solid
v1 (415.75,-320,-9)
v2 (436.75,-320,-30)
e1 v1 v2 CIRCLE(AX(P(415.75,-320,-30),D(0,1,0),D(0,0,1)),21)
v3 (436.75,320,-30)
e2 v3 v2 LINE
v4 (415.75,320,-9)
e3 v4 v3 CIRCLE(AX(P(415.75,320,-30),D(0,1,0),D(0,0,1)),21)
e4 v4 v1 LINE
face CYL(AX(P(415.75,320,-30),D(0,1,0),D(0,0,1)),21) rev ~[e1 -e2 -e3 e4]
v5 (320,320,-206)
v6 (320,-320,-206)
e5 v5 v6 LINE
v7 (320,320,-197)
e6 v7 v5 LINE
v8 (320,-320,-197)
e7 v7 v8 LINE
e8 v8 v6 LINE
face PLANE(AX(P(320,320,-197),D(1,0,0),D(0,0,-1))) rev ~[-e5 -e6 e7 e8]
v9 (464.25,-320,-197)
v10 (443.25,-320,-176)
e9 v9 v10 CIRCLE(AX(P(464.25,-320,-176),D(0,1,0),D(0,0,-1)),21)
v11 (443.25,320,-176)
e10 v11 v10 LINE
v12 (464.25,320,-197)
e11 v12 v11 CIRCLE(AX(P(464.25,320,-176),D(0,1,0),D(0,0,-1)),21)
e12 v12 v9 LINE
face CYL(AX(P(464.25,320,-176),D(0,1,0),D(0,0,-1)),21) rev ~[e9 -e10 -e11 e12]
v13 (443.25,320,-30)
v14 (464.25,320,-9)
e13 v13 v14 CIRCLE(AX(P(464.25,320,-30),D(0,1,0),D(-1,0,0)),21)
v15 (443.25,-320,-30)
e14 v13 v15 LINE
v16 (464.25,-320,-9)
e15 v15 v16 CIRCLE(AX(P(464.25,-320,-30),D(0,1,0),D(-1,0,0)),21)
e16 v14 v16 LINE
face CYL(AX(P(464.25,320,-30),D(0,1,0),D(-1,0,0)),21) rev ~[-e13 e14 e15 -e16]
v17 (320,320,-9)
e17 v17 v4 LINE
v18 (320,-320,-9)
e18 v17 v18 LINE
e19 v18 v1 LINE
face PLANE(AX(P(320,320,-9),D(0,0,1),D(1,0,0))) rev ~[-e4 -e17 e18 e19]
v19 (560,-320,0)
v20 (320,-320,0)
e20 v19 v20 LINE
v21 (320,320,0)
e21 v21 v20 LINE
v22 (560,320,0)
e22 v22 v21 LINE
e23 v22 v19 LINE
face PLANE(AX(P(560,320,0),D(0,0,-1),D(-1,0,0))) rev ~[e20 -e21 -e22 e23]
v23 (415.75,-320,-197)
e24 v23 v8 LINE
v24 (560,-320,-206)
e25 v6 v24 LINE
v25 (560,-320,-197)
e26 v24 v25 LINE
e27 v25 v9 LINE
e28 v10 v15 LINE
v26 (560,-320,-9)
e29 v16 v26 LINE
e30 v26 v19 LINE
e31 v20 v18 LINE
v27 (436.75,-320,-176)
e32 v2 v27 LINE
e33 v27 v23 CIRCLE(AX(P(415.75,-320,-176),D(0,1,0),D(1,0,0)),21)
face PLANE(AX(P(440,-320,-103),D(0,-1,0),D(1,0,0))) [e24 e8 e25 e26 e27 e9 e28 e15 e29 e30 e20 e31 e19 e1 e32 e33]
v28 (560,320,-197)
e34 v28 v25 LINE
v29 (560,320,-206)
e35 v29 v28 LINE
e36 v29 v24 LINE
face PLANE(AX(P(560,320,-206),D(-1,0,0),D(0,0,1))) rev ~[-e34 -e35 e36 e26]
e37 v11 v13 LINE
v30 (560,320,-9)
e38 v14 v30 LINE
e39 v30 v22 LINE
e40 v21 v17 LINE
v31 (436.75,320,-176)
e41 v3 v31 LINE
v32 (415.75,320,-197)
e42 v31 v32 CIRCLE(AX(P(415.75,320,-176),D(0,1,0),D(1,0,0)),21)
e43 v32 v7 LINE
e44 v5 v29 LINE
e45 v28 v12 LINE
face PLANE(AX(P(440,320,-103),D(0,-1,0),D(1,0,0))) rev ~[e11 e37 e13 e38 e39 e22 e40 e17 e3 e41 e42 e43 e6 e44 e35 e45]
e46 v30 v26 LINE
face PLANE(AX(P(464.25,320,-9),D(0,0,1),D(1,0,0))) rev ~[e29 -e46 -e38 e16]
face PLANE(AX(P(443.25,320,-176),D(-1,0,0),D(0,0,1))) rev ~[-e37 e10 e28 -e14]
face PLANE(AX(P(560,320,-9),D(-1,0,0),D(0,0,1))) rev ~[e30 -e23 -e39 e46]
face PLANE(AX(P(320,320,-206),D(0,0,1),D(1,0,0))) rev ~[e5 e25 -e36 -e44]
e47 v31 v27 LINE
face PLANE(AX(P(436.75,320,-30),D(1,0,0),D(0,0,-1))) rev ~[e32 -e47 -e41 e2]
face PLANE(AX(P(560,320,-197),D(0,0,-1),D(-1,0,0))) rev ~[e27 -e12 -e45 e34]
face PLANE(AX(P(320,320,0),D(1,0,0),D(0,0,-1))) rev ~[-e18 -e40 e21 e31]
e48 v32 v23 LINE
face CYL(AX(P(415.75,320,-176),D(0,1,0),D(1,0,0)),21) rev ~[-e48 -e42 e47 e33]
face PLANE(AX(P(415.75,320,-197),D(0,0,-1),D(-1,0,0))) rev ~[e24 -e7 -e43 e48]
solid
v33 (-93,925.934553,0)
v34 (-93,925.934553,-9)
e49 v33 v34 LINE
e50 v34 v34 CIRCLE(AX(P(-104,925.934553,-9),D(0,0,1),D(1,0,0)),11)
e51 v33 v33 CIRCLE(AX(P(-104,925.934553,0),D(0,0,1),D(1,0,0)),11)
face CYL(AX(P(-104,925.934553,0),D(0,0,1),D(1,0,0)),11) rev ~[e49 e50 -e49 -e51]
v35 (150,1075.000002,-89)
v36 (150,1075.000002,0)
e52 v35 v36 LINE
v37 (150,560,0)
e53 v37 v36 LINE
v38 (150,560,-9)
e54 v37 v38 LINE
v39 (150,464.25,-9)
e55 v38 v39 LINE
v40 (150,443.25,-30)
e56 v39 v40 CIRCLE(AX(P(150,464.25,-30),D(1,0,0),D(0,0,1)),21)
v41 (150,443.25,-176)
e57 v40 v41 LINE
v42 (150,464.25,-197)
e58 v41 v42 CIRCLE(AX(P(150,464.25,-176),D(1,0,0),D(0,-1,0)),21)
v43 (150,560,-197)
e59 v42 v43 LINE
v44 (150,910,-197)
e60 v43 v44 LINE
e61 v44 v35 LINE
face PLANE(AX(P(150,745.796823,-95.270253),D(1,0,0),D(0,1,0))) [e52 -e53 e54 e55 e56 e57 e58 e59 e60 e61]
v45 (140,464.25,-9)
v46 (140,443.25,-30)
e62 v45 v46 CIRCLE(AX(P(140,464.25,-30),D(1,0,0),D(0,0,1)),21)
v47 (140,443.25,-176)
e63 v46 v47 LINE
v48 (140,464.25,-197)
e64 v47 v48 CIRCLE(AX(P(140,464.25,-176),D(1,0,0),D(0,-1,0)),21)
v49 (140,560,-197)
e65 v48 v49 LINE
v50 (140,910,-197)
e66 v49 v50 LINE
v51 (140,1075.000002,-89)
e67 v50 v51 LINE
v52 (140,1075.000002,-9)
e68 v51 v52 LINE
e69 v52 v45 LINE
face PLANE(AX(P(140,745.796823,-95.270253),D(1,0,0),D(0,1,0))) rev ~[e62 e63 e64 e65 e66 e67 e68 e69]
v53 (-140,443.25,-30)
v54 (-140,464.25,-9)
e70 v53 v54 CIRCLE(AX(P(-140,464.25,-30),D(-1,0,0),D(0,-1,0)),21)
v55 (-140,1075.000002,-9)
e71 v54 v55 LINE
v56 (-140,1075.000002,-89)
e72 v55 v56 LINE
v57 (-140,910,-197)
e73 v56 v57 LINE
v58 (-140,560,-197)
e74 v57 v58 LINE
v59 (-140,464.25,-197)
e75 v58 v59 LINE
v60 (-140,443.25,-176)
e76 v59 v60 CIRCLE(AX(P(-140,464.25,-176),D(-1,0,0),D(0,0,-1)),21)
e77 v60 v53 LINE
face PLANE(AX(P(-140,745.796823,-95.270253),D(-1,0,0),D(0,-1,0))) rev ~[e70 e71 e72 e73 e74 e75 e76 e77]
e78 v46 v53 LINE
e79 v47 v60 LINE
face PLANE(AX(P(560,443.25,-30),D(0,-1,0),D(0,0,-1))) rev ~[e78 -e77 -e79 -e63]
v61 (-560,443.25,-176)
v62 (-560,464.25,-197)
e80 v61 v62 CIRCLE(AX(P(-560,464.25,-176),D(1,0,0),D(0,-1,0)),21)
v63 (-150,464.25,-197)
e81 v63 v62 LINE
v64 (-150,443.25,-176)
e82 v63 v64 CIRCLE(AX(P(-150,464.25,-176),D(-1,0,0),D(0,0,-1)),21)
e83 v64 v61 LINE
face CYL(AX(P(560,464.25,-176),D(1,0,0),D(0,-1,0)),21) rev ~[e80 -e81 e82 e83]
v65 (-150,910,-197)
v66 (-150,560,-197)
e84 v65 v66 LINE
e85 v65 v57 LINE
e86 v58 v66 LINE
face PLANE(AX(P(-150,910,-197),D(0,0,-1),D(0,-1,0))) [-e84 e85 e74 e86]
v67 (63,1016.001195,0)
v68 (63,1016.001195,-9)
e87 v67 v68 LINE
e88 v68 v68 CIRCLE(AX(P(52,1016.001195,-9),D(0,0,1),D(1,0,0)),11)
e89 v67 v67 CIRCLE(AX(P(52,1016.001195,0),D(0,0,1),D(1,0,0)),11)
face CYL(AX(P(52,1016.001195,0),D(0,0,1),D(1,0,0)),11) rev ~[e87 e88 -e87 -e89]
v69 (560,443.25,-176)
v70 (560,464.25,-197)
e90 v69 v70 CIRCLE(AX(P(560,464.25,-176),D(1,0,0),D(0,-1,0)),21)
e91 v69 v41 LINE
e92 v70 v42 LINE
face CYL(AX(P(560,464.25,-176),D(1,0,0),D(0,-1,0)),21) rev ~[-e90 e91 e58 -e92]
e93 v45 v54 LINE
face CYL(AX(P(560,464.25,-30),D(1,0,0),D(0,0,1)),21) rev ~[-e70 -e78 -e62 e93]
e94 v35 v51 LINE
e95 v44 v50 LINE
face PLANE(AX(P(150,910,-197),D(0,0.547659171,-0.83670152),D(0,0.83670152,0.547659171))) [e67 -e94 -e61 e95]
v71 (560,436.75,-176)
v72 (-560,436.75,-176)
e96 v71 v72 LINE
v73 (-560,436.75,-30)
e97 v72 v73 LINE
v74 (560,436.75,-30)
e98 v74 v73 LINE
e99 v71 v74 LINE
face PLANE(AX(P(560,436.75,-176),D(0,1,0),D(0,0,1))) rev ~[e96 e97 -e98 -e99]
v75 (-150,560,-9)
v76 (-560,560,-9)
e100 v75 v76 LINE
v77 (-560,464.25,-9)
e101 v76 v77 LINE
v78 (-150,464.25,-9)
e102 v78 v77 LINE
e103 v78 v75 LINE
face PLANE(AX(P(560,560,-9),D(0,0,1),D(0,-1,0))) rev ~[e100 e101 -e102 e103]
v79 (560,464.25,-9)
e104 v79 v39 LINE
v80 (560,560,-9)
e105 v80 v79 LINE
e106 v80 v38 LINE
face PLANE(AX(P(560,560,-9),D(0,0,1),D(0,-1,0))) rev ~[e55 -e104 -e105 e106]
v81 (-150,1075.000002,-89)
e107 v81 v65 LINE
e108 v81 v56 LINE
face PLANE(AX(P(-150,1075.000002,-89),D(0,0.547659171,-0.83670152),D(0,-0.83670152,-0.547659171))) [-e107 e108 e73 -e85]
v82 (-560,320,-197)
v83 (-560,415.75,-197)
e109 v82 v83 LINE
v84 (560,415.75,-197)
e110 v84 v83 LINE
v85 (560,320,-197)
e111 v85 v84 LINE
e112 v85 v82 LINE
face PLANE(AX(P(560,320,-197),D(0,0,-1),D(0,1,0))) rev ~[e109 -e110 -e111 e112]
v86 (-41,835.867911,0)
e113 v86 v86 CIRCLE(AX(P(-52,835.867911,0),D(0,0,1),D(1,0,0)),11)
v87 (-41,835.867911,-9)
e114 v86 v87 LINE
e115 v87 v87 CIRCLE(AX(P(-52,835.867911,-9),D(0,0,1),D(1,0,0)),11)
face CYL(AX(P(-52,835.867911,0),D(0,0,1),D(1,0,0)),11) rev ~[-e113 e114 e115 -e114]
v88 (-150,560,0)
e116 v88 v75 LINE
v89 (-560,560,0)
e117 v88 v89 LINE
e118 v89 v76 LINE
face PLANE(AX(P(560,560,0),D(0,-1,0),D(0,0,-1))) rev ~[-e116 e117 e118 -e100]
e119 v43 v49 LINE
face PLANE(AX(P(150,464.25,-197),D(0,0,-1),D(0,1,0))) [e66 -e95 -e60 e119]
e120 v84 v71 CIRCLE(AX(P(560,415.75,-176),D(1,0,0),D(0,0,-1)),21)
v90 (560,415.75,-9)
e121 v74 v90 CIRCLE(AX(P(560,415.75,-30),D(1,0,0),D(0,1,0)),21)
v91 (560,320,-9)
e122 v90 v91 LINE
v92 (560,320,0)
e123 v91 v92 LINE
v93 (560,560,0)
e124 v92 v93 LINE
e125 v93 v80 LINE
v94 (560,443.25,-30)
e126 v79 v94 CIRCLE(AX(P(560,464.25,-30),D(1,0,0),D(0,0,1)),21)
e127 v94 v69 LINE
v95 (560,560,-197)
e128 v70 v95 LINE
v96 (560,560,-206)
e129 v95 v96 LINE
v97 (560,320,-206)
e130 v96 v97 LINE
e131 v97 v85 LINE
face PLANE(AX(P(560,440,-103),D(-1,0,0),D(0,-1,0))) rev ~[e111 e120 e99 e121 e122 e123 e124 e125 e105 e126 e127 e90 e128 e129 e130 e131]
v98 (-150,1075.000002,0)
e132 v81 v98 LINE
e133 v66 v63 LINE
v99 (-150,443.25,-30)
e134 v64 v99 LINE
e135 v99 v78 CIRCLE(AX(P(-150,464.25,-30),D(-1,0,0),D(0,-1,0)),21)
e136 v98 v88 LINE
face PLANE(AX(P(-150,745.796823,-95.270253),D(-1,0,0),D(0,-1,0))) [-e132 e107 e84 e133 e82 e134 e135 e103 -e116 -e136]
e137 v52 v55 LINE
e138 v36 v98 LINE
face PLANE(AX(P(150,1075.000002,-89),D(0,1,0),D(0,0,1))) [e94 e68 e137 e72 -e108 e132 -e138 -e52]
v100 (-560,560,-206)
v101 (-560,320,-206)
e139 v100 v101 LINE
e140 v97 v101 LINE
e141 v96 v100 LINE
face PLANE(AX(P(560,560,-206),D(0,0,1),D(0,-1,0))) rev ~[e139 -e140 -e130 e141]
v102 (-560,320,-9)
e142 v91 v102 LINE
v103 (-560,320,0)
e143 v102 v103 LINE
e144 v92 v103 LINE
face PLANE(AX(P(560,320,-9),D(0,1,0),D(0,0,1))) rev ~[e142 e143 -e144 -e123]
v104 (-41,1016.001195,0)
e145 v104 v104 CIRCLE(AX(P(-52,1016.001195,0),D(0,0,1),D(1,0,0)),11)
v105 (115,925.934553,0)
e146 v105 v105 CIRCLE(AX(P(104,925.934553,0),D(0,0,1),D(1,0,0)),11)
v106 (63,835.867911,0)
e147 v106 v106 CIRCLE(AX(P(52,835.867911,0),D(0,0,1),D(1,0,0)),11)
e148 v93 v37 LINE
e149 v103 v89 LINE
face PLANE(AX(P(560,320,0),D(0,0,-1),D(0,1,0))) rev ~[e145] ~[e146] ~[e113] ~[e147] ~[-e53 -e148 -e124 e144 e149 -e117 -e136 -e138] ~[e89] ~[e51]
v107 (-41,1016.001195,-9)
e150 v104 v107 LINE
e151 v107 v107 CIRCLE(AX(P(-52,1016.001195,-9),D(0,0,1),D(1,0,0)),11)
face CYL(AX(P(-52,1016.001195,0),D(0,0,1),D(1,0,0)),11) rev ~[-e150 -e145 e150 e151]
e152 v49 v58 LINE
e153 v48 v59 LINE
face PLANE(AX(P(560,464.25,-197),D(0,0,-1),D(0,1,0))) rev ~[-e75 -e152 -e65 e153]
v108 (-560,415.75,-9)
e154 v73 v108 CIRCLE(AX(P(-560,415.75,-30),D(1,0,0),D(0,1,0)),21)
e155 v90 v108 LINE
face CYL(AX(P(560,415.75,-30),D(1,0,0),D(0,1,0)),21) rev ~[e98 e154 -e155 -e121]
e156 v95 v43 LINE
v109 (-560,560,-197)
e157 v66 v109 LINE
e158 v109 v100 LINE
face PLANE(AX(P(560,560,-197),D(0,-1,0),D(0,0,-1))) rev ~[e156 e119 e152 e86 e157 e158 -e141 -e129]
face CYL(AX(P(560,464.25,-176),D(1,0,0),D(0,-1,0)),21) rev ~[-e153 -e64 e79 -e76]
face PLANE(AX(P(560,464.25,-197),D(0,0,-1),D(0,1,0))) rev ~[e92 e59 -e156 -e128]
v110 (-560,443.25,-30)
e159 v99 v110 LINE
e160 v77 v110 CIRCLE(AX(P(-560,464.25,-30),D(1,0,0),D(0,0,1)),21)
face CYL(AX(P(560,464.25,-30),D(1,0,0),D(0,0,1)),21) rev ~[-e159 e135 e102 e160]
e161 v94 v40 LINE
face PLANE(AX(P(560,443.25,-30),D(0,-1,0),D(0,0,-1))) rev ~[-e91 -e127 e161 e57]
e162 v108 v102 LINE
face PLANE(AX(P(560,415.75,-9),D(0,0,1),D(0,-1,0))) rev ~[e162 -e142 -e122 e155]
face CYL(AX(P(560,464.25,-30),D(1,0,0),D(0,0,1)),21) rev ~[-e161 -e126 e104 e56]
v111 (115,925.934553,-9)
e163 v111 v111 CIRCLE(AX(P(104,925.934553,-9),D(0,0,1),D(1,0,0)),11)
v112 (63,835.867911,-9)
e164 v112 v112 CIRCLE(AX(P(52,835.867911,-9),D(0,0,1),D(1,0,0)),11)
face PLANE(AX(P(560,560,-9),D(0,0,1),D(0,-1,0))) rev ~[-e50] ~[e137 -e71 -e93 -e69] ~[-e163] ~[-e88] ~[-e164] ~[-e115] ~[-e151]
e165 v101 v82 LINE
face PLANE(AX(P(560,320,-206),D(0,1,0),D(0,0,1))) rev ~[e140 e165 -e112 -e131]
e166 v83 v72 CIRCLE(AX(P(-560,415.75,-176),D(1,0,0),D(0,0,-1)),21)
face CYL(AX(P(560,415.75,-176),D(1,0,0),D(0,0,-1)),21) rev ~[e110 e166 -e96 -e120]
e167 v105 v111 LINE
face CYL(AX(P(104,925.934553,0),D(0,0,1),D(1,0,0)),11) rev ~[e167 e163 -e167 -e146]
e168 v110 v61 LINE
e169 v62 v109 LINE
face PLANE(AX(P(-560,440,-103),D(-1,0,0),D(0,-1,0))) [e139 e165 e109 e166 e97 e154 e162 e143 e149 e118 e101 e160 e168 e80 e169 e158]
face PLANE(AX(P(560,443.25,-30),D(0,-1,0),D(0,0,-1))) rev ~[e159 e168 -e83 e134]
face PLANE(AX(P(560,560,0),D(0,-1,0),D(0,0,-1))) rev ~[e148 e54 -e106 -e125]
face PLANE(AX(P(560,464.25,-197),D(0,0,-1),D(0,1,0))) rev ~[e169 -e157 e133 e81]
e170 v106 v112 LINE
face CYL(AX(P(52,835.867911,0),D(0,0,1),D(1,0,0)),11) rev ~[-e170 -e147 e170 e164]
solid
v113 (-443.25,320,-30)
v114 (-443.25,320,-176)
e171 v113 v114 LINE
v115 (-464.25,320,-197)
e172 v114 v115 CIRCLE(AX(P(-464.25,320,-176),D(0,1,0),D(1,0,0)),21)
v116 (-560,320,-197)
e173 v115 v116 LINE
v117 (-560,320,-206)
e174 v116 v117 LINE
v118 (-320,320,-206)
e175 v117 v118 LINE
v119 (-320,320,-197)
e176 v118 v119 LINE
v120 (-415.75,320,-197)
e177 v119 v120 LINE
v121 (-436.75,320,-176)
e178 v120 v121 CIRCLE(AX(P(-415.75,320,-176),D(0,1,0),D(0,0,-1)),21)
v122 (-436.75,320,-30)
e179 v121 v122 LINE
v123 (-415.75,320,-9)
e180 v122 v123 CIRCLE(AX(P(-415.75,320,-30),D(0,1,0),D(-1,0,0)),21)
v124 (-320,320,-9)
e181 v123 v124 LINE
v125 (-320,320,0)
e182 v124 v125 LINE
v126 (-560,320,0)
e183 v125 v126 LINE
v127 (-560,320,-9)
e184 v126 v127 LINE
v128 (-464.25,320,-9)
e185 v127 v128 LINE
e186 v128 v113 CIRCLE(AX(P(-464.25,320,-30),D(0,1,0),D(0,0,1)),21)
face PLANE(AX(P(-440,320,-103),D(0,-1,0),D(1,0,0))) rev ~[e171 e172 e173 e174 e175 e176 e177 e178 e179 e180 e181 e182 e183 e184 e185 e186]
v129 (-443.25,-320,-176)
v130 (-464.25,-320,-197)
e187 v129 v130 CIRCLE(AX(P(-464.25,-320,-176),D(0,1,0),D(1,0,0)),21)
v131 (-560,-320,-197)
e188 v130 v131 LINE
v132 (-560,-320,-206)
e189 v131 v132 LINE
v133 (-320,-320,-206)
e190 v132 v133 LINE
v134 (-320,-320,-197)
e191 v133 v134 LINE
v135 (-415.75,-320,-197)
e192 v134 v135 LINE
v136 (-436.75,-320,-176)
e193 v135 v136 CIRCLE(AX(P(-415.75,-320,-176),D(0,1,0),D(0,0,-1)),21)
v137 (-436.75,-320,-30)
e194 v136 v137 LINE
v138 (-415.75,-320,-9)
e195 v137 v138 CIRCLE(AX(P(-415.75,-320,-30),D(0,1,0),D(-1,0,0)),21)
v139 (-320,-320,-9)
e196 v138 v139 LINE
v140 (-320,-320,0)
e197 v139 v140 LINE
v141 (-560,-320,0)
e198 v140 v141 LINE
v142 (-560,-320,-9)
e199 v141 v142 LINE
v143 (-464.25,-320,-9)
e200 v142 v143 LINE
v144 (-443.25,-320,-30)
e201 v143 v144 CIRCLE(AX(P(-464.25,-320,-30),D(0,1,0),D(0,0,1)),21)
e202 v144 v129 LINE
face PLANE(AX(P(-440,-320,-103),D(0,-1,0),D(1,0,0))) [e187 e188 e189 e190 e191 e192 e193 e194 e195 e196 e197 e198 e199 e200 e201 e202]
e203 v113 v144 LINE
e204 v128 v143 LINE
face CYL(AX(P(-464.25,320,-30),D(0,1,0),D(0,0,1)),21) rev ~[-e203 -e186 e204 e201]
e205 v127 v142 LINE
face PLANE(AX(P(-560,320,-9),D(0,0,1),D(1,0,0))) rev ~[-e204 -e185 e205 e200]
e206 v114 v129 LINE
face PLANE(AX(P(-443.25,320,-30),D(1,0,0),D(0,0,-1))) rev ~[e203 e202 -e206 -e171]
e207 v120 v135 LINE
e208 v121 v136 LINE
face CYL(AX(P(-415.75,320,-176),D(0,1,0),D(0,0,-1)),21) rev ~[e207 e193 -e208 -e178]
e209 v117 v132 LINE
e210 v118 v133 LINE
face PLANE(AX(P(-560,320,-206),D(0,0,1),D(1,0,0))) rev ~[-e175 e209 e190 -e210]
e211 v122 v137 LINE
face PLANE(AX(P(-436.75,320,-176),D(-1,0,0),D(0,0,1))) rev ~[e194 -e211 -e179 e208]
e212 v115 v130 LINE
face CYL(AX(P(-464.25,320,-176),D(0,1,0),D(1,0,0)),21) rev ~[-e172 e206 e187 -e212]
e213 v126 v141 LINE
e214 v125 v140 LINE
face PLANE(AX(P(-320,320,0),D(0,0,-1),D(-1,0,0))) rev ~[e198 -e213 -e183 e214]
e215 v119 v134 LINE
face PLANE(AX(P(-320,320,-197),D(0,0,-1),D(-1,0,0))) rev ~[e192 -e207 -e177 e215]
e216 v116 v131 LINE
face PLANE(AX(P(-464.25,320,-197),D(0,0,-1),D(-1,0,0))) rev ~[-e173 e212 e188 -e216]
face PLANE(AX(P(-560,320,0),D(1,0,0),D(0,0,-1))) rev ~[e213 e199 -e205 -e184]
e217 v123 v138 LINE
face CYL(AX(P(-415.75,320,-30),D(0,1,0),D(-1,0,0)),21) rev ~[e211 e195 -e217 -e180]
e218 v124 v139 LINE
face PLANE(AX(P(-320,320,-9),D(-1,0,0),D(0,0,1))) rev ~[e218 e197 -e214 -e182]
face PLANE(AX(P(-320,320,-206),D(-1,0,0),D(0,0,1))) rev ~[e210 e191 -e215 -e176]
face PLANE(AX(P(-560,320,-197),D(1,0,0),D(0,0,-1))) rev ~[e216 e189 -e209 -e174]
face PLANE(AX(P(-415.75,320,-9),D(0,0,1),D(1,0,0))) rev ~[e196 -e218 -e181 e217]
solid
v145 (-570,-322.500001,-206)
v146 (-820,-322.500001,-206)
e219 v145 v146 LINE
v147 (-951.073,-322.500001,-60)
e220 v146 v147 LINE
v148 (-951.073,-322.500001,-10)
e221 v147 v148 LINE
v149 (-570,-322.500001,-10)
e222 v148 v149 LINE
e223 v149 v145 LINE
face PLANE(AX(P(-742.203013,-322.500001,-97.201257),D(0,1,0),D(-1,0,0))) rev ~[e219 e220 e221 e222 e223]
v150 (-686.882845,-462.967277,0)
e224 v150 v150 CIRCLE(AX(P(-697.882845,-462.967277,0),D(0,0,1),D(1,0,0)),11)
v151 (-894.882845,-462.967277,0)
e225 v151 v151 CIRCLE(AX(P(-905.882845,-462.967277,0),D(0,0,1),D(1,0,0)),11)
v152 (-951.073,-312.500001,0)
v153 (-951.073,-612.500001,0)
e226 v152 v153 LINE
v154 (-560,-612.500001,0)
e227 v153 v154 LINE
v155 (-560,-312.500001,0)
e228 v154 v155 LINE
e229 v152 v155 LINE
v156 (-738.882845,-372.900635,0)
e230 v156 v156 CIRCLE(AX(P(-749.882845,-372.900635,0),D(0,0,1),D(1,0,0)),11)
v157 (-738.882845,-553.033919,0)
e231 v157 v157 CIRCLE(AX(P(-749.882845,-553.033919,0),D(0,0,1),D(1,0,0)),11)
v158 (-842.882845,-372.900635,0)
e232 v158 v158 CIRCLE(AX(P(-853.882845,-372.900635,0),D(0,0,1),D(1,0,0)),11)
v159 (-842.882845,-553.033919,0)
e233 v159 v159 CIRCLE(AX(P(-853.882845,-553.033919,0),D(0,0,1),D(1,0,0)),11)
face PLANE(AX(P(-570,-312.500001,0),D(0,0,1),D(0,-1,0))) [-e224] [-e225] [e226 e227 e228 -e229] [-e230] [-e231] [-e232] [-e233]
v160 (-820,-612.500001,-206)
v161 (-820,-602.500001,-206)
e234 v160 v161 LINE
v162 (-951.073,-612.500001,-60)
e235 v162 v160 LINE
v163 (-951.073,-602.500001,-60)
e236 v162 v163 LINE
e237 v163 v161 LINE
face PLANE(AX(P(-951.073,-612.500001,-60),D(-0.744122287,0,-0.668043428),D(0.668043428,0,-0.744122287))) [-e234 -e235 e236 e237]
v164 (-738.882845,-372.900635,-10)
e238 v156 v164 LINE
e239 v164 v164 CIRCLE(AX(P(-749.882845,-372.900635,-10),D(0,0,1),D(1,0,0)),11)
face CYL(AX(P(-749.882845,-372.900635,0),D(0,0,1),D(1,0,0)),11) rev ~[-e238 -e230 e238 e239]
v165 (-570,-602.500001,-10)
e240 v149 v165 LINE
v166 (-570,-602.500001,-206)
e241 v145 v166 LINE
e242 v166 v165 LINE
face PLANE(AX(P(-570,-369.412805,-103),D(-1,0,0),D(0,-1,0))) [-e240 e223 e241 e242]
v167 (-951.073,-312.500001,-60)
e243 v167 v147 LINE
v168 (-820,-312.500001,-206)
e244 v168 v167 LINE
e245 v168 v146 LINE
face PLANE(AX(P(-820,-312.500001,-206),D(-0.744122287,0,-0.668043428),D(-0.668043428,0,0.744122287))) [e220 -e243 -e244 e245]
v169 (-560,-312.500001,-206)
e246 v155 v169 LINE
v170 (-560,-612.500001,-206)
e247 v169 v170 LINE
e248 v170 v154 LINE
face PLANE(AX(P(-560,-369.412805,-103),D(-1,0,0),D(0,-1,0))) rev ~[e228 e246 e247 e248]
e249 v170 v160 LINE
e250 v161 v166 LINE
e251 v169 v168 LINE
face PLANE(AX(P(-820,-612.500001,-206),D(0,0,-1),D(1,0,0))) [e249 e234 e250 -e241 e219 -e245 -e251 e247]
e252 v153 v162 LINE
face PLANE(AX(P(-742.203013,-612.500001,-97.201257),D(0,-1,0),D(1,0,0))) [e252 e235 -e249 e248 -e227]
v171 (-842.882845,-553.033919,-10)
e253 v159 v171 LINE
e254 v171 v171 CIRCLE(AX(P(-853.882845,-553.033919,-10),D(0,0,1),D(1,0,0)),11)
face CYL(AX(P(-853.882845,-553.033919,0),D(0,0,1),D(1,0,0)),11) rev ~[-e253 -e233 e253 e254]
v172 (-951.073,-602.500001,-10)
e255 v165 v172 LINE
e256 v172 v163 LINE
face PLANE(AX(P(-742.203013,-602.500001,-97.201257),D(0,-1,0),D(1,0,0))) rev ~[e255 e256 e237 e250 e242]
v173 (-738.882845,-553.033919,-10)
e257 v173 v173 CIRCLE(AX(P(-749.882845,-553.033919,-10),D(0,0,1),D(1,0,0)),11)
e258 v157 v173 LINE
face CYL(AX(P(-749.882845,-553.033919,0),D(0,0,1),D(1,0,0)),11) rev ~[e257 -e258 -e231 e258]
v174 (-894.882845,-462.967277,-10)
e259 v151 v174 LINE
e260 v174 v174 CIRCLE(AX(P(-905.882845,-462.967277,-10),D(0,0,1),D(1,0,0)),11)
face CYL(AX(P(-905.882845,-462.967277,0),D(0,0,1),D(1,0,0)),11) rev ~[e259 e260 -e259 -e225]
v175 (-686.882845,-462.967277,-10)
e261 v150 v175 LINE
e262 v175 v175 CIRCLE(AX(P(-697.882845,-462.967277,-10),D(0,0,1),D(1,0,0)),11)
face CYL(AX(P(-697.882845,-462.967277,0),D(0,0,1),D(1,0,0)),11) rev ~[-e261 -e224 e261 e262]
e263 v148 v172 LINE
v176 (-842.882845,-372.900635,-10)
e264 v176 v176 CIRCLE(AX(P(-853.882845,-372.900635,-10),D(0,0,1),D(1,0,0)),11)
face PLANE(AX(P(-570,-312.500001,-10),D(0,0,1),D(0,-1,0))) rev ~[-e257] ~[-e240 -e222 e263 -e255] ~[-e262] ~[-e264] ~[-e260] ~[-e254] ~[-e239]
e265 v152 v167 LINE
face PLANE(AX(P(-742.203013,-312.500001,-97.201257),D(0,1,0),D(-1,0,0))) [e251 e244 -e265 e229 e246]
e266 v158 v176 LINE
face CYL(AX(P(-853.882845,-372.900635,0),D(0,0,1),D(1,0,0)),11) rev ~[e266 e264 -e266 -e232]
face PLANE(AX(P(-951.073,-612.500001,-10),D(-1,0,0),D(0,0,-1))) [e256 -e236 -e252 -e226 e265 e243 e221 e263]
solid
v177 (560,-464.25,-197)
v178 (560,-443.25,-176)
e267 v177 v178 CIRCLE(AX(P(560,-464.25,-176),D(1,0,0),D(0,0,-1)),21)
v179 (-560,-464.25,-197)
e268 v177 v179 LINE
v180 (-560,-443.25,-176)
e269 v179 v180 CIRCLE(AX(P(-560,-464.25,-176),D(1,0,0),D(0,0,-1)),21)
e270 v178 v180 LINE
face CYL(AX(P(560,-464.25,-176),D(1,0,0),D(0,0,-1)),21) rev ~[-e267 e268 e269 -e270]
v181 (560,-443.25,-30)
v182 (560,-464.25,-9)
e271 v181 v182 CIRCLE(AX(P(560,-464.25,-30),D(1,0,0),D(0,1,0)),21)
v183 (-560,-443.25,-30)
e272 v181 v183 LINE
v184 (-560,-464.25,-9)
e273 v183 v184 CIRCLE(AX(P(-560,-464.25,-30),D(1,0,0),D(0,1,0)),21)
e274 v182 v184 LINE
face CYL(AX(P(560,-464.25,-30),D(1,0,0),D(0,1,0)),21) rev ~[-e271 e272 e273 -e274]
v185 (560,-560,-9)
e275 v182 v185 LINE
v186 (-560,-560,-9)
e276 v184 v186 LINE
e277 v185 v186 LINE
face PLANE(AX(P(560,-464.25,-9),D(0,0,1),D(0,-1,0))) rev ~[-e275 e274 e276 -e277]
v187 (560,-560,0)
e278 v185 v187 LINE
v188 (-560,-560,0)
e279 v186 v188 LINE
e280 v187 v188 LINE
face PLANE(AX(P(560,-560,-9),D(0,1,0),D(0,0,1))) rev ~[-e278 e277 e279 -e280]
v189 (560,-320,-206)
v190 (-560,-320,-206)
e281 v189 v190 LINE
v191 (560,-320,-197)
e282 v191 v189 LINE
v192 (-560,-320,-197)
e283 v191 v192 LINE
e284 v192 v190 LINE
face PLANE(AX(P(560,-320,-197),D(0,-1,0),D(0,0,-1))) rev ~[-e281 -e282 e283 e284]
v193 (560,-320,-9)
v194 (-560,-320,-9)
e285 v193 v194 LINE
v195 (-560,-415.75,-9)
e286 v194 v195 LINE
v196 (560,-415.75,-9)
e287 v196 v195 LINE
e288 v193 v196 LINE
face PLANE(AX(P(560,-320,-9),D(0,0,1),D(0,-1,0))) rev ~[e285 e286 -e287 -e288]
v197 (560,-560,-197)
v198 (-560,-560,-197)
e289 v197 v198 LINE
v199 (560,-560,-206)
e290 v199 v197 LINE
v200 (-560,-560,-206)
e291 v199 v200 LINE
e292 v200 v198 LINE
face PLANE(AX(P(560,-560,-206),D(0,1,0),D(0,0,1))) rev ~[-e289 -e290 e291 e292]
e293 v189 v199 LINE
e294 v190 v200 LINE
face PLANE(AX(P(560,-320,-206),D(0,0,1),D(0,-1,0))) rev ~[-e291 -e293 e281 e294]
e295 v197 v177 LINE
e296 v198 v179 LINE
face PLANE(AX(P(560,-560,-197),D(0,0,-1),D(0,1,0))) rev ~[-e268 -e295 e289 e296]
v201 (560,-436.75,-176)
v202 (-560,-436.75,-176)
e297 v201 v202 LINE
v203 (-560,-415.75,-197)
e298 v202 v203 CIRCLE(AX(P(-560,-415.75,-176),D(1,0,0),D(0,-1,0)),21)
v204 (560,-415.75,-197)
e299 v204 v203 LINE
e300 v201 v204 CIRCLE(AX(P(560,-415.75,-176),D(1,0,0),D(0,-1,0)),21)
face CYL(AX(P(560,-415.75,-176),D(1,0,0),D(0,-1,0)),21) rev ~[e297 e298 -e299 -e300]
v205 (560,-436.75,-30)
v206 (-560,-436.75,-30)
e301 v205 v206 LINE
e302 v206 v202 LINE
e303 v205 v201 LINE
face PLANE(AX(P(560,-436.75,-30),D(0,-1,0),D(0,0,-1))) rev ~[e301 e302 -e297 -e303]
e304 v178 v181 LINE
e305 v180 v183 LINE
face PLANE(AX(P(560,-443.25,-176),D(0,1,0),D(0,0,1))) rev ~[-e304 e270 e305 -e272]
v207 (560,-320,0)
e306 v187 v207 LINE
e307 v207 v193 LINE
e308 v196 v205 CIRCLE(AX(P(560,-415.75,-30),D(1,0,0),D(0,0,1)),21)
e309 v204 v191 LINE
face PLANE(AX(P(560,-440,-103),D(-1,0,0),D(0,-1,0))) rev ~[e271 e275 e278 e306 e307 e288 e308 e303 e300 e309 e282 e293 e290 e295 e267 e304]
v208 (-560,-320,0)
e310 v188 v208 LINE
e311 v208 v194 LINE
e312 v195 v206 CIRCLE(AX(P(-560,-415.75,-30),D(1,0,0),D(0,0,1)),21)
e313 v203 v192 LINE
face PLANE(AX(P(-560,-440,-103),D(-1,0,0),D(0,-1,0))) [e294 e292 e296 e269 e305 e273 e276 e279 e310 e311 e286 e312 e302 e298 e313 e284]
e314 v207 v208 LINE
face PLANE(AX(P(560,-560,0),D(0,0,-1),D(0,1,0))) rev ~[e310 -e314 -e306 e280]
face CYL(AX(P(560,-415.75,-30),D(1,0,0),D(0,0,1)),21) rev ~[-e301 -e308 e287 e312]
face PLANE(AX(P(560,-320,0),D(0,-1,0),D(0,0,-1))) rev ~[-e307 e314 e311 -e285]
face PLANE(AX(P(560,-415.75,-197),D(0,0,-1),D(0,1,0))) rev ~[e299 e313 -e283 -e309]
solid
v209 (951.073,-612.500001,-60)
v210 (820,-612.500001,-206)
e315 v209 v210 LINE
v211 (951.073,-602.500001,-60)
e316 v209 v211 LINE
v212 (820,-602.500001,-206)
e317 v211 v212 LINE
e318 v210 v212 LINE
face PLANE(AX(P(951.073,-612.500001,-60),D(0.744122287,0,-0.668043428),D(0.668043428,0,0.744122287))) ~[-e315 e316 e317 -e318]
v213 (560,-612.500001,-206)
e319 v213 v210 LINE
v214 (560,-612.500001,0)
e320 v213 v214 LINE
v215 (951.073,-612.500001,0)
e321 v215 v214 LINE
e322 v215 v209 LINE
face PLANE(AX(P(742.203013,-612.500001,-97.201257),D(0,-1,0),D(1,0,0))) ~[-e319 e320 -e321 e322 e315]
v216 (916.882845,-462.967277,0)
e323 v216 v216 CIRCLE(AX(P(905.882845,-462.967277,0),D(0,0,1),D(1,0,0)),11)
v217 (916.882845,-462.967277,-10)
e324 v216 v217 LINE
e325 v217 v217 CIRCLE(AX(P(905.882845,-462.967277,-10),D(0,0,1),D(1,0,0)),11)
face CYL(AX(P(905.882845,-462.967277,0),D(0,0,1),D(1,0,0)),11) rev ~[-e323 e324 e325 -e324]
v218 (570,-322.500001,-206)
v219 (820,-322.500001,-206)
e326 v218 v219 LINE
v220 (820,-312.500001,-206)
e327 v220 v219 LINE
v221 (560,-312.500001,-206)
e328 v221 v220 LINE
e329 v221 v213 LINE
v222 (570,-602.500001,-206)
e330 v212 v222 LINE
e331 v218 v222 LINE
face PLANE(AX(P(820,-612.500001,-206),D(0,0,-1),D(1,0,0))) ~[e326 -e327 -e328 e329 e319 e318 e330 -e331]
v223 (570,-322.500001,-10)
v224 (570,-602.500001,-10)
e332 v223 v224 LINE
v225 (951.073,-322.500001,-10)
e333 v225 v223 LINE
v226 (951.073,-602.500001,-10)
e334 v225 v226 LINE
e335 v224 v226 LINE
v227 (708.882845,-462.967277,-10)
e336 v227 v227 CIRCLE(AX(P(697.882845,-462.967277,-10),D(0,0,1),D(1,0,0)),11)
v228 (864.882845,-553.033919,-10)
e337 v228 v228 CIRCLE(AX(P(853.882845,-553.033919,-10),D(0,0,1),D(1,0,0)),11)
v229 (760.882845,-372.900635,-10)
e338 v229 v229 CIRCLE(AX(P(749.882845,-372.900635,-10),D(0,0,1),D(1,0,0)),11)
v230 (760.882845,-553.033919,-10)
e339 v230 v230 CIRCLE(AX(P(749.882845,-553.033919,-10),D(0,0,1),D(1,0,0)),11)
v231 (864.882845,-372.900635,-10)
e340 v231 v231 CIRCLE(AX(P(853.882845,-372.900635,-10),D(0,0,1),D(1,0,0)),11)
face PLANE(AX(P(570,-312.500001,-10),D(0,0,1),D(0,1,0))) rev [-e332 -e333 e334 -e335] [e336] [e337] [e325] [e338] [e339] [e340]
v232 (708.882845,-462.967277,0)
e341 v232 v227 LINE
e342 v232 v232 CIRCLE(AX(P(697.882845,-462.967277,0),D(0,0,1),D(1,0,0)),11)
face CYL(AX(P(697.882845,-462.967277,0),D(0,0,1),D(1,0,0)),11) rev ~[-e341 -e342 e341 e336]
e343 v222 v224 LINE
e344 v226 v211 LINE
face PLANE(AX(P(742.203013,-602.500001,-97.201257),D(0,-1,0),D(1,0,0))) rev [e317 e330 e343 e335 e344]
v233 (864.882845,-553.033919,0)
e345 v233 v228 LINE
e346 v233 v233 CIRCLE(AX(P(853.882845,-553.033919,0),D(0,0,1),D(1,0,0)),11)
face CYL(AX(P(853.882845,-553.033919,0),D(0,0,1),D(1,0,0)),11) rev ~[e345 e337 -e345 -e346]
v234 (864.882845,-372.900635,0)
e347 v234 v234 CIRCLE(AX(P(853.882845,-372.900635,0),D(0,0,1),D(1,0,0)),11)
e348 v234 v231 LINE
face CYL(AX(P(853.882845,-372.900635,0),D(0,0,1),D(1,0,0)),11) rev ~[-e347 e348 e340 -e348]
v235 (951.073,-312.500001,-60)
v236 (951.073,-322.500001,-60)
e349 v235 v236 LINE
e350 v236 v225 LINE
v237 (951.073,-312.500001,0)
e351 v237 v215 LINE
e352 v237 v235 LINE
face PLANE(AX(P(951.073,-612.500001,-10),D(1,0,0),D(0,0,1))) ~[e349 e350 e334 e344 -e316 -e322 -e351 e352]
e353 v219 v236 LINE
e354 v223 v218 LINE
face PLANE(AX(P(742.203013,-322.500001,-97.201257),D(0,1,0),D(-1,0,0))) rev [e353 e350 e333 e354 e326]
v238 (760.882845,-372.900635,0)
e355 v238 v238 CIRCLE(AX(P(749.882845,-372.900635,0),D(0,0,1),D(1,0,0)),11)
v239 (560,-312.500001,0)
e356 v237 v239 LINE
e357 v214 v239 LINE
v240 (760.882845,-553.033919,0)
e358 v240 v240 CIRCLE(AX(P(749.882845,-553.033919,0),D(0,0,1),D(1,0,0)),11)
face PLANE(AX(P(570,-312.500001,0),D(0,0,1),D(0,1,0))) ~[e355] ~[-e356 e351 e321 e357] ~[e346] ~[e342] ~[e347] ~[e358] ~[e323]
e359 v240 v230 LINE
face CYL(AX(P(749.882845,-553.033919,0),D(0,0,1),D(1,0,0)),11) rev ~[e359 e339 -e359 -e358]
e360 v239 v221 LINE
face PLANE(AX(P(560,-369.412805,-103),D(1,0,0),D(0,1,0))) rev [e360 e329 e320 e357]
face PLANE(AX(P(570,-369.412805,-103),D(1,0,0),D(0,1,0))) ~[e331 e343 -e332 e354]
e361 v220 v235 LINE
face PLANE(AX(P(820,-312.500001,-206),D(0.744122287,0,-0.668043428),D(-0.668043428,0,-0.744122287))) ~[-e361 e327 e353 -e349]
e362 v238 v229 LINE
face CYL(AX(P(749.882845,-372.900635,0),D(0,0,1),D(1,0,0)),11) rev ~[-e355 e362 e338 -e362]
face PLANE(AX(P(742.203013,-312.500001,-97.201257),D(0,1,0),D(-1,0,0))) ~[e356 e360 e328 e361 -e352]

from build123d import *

# Parameters (mm, degrees)
F3_DEPTH  = 1120
F5_DEPTH  = 640
F8_DEPTH  = 9
F10_DEPTH = 10
F12_DEPTH = 10
F14_DEPTH = 10
F15_W     = 300
F15_H     = 10
F16_DEPTH = 381.073
F18_DEPTH = 10
F20_DEPTH = 10
F22_R     = 11
F23_DEPTH = 25


with BuildPart() as f3:
    # F2 (on line) → F3 (new body)
    with BuildSketch(Plane(origin=(560, 0, 0), x_dir=(0, -1, 0), z_dir=(-1, 0, 0))):
        with BuildLine():
            Line((560, -9), (560, 0))
            Line((560, 0), (320, 0))
            Line((320, 0), (320, -9))
            Line((320, -9), (415.75, -9))
            ThreePointArc((415.75, -9), (430.5992424049, -15.1507575951), (436.75, -30))
            Line((436.75, -30), (436.75, -176))
            ThreePointArc((436.75, -176), (430.5992424049, -190.8492424049), (415.75, -197))
            Line((415.75, -197), (320, -197))
            Line((320, -197), (320, -206))
            Line((320, -206), (560, -206))
            Line((560, -206), (560, -197))
            Line((560, -197), (464.25, -197))
            ThreePointArc((464.25, -197), (449.4007575951, -190.8492424049), (443.25, -176))
            Line((443.25, -176), (443.25, -30))
            ThreePointArc((443.25, -30), (449.4007575951, -15.1507575951), (464.25, -9))
            Line((464.25, -9), (560, -9))
        make_face()
    extrude(amount=F3_DEPTH)


with BuildPart() as f3b:
    # F2 (on line) → F3, piece 2 (new body)
    with BuildSketch(Plane(origin=(560, 0, 0), x_dir=(0, -1, 0), z_dir=(-1, 0, 0))):
        with BuildLine():
            Line((-320, 0), (-560, 0))
            Line((-560, 0), (-560, -9))
            Line((-560, -9), (-464.25, -9))
            ThreePointArc((-464.25, -9), (-449.4007575951, -15.1507575951), (-443.25, -30))
            Line((-443.25, -30), (-443.25, -176))
            ThreePointArc((-443.25, -176), (-449.4007575951, -190.8492424049), (-464.25, -197))
            Line((-464.25, -197), (-560, -197))
            Line((-560, -197), (-560, -206))
            Line((-560, -206), (-320, -206))
            Line((-320, -206), (-320, -197))
            Line((-320, -197), (-415.75, -197))
            ThreePointArc((-415.75, -197), (-430.5992424049, -190.8492424049), (-436.75, -176))
            Line((-436.75, -176), (-436.75, -30))
            ThreePointArc((-436.75, -30), (-430.5992424049, -15.1507575951), (-415.75, -9))
            Line((-415.75, -9), (-320, -9))
            Line((-320, -9), (-320, 0))
        make_face()
    extrude(amount=F3_DEPTH)

    # F7 (on face) → F8 (join)
    with BuildSketch(Plane.XY):
        Polygon((-150, 925.0000017314), (-150, 560), (150, 560), (150, 925.0000017314), (150, 1075.0000017314), (-150, 1075.0000017314), align=None)
    extrude(amount=-F8_DEPTH)

    # F9 (on face) → F10 (join)
    with BuildSketch(Plane(origin=(-150, 0, 0), x_dir=(0, -1, 0), z_dir=(-1, 0, 0))):
        with BuildLine():
            Line((-464.25, -9), (-560, -9))
            Line((-560, -9), (-1075.0000017314, -9))
            Line((-1075.0000017314, -9), (-1075.0000017314, -89))
            Line((-1075.0000017314, -89), (-910, -197))
            Line((-910, -197), (-560, -197))
            Line((-560, -197), (-464.25, -197))
            ThreePointArc((-464.25, -197), (-449.4007575951, -190.8492424049), (-443.25, -176))
            Line((-443.25, -176), (-443.25, -30))
            ThreePointArc((-443.25, -30), (-449.4007575951, -15.1507575951), (-464.25, -9))
        make_face()
    extrude(amount=-F10_DEPTH)

    # F11 (on face) → F12 (join)
    with BuildSketch(Plane.YZ.offset(150)):
        with BuildLine():
            Line((1075.0000017314, -9), (560, -9))
            Line((560, -9), (464.25, -9))
            ThreePointArc((464.25, -9), (449.4007575951, -15.1507575951), (443.25, -30))
            Line((443.25, -30), (443.25, -176))
            ThreePointArc((443.25, -176), (449.4007575951, -190.8492424049), (464.25, -197))
            Line((464.25, -197), (560, -197))
            Line((560, -197), (910, -197))
            Line((910, -197), (1075.0000017314, -89))
            Line((1075.0000017314, -89), (1075.0000017314, -9))
        make_face()
    extrude(amount=-F12_DEPTH)


with BuildPart() as f5:
    # F4 (on face) → F5 (new body, through all)
    with BuildSketch(Plane.XZ.offset(-320)):
        with BuildLine():
            Line((-320, 0), (-560, 0))
            Line((-560, 0), (-560, -9))
            Line((-560, -9), (-464.25, -9))
            ThreePointArc((-464.25, -9), (-449.4007575951, -15.1507575951), (-443.25, -30))
            Line((-443.25, -30), (-443.25, -176))
            ThreePointArc((-443.25, -176), (-449.4007575951, -190.8492424049), (-464.25, -197))
            Line((-464.25, -197), (-560, -197))
            Line((-560, -197), (-560, -206))
            Line((-560, -206), (-320, -206))
            Line((-320, -206), (-320, -197))
            Line((-320, -197), (-415.75, -197))
            ThreePointArc((-415.75, -197), (-430.5992424049, -190.8492424049), (-436.75, -176))
            Line((-436.75, -176), (-436.75, -30))
            ThreePointArc((-436.75, -30), (-430.5992424049, -15.1507575951), (-415.75, -9))
            Line((-415.75, -9), (-320, -9))
            Line((-320, -9), (-320, 0))
        make_face()
    extrude(amount=F5_DEPTH)


with BuildPart() as f5b:
    # F4 (on face) → F5, piece 2 (new body, through all)
    with BuildSketch(Plane.XZ.offset(-320)):
        with BuildLine():
            Line((560, -206), (560, -197))
            Line((560, -197), (464.25, -197))
            ThreePointArc((464.25, -197), (449.4007575951, -190.8492424049), (443.25, -176))
            Line((443.25, -176), (443.25, -30))
            ThreePointArc((443.25, -30), (449.4007575951, -15.1507575951), (464.25, -9))
            Line((464.25, -9), (560, -9))
            Line((560, -9), (560, 0))
            Line((560, 0), (320, 0))
            Line((320, 0), (320, -9))
            Line((320, -9), (415.75, -9))
            ThreePointArc((415.75, -9), (430.5992424049, -15.1507575951), (436.75, -30))
            Line((436.75, -30), (436.75, -176))
            ThreePointArc((436.75, -176), (430.5992424049, -190.8492424049), (415.75, -197))
            Line((415.75, -197), (320, -197))
            Line((320, -197), (320, -206))
            Line((320, -206), (560, -206))
        make_face()
    extrude(amount=F5_DEPTH)


with BuildPart() as f14:
    # F13 (on face) → F14 (new body)
    with BuildSketch(Plane(origin=(-560, 0, 0), x_dir=(0, -1, 0), z_dir=(-1, 0, 0))):
        with BuildLine():
            Line((312.5000008657, 0), (312.5000008657, -206))
            Line((312.5000008657, -206), (320, -206))
            Line((320, -206), (320, -197))
            Line((320, -197), (415.75, -197))
            ThreePointArc((415.75, -197), (430.5992424049, -190.8492424049), (436.75, -176))
            Line((436.75, -176), (436.75, -30))
            ThreePointArc((436.75, -30), (430.5992424049, -15.1507575951), (415.75, -9))
            Line((415.75, -9), (320, -9))
            Line((320, -9), (320, 0))
            Line((320, 0), (312.5000008657, 0))
        make_face()
        with BuildLine():
            Line((320, -197), (320, -206))
            Line((320, -206), (560, -206))
            Line((560, -206), (560, -197))
            Line((560, -197), (464.25, -197))
            ThreePointArc((464.25, -197), (449.4007575951, -190.8492424049), (443.25, -176))
            Line((443.25, -176), (443.25, -30))
            ThreePointArc((443.25, -30), (449.4007575951, -15.1507575951), (464.25, -9))
            Line((464.25, -9), (560, -9))
            Line((560, -9), (560, 0))
            Line((560, 0), (462.5000008657, 0))
            Line((462.5000008657, 0), (320, 0))
            Line((320, 0), (320, -9))
            Line((320, -9), (415.75, -9))
            ThreePointArc((415.75, -9), (430.5992424049, -15.1507575951), (436.75, -30))
            Line((436.75, -30), (436.75, -176))
            ThreePointArc((436.75, -176), (430.5992424049, -190.8492424049), (415.75, -197))
            Line((415.75, -197), (320, -197))
        make_face()
        with BuildLine():
            Line((560, -197), (560, -206))
            Line((560, -206), (612.5000008657, -206))
            Line((612.5000008657, -206), (612.5000008657, 0))
            Line((612.5000008657, 0), (560, 0))
            Line((560, 0), (560, -9))
            Line((560, -9), (464.25, -9))
            ThreePointArc((464.25, -9), (449.4007575951, -15.1507575951), (443.25, -30))
            Line((443.25, -30), (443.25, -176))
            ThreePointArc((443.25, -176), (449.4007575951, -190.8492424049), (464.25, -197))
            Line((464.25, -197), (560, -197))
        make_face()
    extrude(amount=F14_DEPTH)

    # F15 (on face) → F16 (join)
    with BuildSketch(Plane(origin=(-570, 0, 0), x_dir=(0, -1, 0), z_dir=(-1, 0, 0))):
        with Locations((462.5000008657, -5)):
            Rectangle(F15_W, F15_H)
    extrude(amount=F16_DEPTH)

    # F17 (on face) → F18 (join)
    with BuildSketch(Plane(origin=(0, -312.5000008657, 0), x_dir=(-1, 0, 0), z_dir=(0, 1, 0))):
        Polygon((951.073, -60), (951.073, -10), (570, -10), (570, -206), (820, -206), align=None)
    extrude(amount=-F18_DEPTH)

    # F19 (on face) → F20 (join)
    with BuildSketch(Plane.XZ.offset(612.5000008657)):
        Polygon((-820, -206), (-570, -206), (-570, -10), (-951.073, -10), (-951.073, -60), align=None)
    extrude(amount=-F20_DEPTH)


with BuildPart() as f21_1:
    # F21: instance of F14
    add(f14.part.mirror(Plane.YZ))


with BuildPart() as f23_tool:
    # F22 (on face) → F23 (new body)
    with BuildSketch(Plane.XY):
        with Locations((104, 925.9345531464)):
            Circle(F22_R)
        with Locations((-853.8828452665, -372.9006345796)):
            Circle(F22_R)
        with Locations((749.8828452665, -553.0339185668)):
            Circle(F22_R)
        with Locations((-104, 925.9345531464)):
            Circle(F22_R)
        with Locations((-52, 1016.0011951399)):
            Circle(F22_R)
        with Locations((-52, 835.8679111528)):
            Circle(F22_R)
        with Locations((52, 1016.0011951399)):
            Circle(F22_R)
        with Locations((52, 835.8679111528)):
            Circle(F22_R)
        with Locations((-905.8828452665, -462.9672765732)):
            Circle(F22_R)
        with Locations((-697.8828452665, -462.9672765732)):
            Circle(F22_R)
        with Locations((-853.8828452665, -553.0339185668)):
            Circle(F22_R)
        with Locations((-749.8828452665, -553.0339185668)):
            Circle(F22_R)
        with Locations((-749.8828452665, -372.9006345796)):
            Circle(F22_R)
        with Locations((853.8828452665, -553.0339185668)):
            Circle(F22_R)
        with Locations((749.8828452665, -372.9006345796)):
            Circle(F22_R)
        with Locations((905.8828452665, -462.9672765732)):
            Circle(F22_R)
        with Locations((853.8828452665, -372.9006345796)):
            Circle(F22_R)
        with Locations((697.8828452665, -462.9672765732)):
            Circle(F22_R)
    extrude(amount=-F23_DEPTH)


with BuildPart() as f3b_1:
    add(f3b.part)

    # F23: cut by f23_tool
    add(f23_tool.part, mode=Mode.SUBTRACT)


with BuildPart() as f14_1:
    add(f14.part)

    # F23: cut by f23_tool
    add(f23_tool.part, mode=Mode.SUBTRACT)


with BuildPart() as f21_1_1:
    add(f21_1.part)

    # F23: cut by f23_tool
    add(f23_tool.part, mode=Mode.SUBTRACT)


solid = Compound([f3.part, f5.part, f5b.part, f3b_1.part, f14_1.part, f21_1_1.part])
